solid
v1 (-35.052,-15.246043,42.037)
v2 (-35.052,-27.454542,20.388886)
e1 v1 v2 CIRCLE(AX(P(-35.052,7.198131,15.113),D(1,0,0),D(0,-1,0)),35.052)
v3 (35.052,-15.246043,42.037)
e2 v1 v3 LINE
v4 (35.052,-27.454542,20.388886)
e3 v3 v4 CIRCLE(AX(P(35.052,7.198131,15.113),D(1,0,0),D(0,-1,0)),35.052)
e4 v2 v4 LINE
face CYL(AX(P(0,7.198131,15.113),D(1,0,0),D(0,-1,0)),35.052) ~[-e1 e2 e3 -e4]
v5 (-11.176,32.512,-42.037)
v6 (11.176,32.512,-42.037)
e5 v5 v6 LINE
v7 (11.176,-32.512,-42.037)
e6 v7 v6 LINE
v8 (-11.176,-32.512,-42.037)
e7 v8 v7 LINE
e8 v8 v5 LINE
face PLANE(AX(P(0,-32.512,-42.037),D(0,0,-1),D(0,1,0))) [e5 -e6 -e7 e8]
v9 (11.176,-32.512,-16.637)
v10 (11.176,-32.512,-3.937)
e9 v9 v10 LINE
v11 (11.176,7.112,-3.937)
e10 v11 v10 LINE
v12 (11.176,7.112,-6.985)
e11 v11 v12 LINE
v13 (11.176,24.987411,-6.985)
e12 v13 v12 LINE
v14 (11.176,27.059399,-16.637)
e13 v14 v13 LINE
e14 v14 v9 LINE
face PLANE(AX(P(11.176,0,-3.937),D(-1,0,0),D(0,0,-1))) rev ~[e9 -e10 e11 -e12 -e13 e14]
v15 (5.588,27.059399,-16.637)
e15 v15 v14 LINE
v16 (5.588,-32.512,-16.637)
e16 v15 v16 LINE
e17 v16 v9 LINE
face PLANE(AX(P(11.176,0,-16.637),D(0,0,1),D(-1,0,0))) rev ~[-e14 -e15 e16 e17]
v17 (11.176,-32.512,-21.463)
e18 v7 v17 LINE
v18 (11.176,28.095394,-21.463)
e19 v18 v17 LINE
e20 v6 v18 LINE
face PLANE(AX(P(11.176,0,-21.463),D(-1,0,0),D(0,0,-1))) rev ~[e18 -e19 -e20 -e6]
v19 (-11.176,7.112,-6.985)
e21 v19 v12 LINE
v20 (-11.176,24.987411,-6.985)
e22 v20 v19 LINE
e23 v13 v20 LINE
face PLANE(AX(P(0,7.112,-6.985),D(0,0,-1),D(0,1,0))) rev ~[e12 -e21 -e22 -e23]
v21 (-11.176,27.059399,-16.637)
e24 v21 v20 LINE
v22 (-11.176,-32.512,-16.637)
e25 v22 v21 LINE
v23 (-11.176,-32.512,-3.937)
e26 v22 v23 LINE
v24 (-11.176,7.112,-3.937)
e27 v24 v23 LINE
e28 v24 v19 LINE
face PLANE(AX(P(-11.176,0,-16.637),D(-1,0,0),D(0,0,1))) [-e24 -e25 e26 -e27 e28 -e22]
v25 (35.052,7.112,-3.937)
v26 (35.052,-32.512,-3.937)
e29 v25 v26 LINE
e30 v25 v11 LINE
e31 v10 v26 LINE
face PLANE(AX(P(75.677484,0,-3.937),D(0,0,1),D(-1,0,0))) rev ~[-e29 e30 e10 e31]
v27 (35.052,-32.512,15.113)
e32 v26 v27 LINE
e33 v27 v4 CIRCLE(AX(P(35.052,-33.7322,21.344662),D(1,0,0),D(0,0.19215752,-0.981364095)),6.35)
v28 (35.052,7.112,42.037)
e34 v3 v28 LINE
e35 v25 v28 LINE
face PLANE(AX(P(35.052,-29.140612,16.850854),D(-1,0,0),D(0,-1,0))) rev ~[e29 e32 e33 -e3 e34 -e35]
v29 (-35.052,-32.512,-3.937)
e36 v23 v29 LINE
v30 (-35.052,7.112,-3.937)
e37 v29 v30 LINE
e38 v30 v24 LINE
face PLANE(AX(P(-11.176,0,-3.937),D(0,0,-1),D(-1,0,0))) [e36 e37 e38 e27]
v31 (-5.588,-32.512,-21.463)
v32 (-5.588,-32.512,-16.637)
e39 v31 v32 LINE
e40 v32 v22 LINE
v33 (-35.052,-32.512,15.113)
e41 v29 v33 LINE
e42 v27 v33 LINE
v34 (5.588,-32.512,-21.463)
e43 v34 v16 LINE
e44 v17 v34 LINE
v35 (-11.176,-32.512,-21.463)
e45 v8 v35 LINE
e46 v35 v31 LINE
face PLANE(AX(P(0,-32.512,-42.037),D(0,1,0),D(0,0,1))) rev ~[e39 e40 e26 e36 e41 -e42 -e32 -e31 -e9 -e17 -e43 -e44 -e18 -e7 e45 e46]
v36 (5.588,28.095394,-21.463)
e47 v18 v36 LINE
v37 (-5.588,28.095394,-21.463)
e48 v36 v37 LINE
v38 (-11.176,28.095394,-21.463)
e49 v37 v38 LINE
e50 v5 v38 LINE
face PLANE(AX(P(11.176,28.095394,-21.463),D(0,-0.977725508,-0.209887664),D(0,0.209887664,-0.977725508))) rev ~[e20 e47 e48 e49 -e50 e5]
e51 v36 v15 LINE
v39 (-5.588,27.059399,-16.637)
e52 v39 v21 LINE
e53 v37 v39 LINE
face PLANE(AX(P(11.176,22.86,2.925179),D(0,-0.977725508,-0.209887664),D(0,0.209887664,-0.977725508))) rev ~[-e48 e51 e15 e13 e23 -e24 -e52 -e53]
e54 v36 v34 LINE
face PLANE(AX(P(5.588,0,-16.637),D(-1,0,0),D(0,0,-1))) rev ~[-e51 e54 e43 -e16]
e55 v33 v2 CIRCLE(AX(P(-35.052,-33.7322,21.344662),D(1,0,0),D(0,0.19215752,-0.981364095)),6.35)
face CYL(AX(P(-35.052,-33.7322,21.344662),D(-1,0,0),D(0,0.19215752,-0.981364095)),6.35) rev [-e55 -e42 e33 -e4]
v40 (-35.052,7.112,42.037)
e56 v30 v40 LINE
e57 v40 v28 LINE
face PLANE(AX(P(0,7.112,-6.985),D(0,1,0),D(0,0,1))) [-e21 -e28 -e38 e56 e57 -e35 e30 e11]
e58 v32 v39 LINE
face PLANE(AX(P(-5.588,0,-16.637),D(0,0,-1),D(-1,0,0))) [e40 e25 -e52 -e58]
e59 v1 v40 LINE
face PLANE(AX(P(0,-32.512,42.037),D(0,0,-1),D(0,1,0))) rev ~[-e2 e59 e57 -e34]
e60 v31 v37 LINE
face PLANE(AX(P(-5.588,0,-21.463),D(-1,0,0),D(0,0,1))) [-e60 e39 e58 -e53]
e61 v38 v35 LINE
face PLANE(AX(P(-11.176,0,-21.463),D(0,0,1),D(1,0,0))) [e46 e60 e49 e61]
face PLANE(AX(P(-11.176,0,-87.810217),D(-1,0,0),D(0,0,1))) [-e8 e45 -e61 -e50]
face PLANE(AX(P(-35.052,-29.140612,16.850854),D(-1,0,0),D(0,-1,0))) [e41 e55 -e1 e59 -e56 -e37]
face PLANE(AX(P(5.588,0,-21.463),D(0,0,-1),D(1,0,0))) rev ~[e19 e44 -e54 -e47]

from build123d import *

# Parameters (mm, degrees)
F0_W          = 65.024
F0_H          = 84.074
F1_DEPTH      = 35.052
F1_DEPTH_BACK = 35.052
F3_DEPTH      = 63.5
F4_W          = 77.3881527235
F4_H          = 70.5238262352
F5_DEPTH      = 38.1
F7_DEPTH      = 25.4
F9_DEPTH      = 38.1
F10_T1_DEPTH  = 70.104


# Not quite as in the source:
# - a fillet or chamfer that OpenCascade refuses, or shapes differently, is made with other operations: its cross-section is extruded or revolved along the edge and cut away or added


with BuildPart() as f1:
    # F0 (on Right) → F1 (new body, two sides)
    with BuildSketch(Plane.YZ) as f1_sk:
        Rectangle(F0_W, F0_H)
    extrude(amount=F1_DEPTH)
    extrude(f1_sk.sketch, amount=-F1_DEPTH_BACK)

    # F2 (on Front) → F3 (cut, symmetric)
    with BuildSketch(Plane.XZ):
        Polygon((-11.176, -16.637), (-11.176, -3.937), (-78.232, -3.937), (-78.232, -87.8102174824), (-11.176, -87.8102174824), (-11.176, -21.463), (-5.588, -21.463), (-5.588, -16.637), align=None)
        Polygon((75.6774835046, -3.937), (11.176, -3.937), (11.176, -16.637), (5.588, -16.637), (5.588, -21.463), (11.176, -21.463), (11.176, -87.8102174824), (75.6774835046, -87.8102174824), align=None)
    extrude(amount=F3_DEPTH, both=True, mode=Mode.SUBTRACT)

    # F4 (on Right) → F5 (cut, symmetric)
    with BuildSketch(Plane.YZ):
        with Locations((45.8060763618, 28.2769131176)):
            Rectangle(F4_W, F4_H)
    extrude(amount=F5_DEPTH, both=True, mode=Mode.SUBTRACT)

    # F6 (on face) → F7 (cut, symmetric)
    with BuildSketch(Plane.YZ.offset(11.176)):
        Polygon((32.512, -21.463), (32.512, -42.037), (58.1510797716, -47.1596371092), (55.1210400309, 2.9251785083), (22.86, 2.9251785083), (28.0953935412, -21.463), align=None)
        Polygon((28.0953935412, -21.463), (32.512, -42.037), (32.512, -21.463), align=None)
    extrude(amount=F7_DEPTH, both=True, mode=Mode.SUBTRACT)

    # F8 (on Right) → F9 (cut, symmetric)
    with BuildSketch(Plane.YZ):
        with BuildLine():
            ThreePointArc((-27.8538692881, 15.113), (-17.5873761822, 39.8985068942), (7.1981307119, 50.165))
            Line((7.1981307119, 50.165), (-30.8227688074, 66.0536216443))
            Line((-30.8227688074, 66.0536216443), (-47.4338419735, 15.113))
            Line((-47.4338419735, 15.113), (-27.8538692881, 15.113))
        make_face()
    extrude(amount=F9_DEPTH, both=True, mode=Mode.SUBTRACT)

    # F10: fillet of radius 6.35 on 1 edges, made by hand

    # F10_s2 → F10_t1 (join)
    with BuildSketch(Plane.YZ.offset(-35.052)):
        with BuildLine():
            ThreePointArc((-32.512, 15.113), (-29.1481831988, 16.9504285484), (-27.454542127, 20.3888856242))
            ThreePointArc((-27.454542127, 20.3888856242), (-27.7538949257, 17.7584882017), (-27.8538692881, 15.113))
            Line((-27.8538692881, 15.113), (-32.512, 15.113))
        make_face()
    extrude(amount=F10_T1_DEPTH)


solid = f1.part
